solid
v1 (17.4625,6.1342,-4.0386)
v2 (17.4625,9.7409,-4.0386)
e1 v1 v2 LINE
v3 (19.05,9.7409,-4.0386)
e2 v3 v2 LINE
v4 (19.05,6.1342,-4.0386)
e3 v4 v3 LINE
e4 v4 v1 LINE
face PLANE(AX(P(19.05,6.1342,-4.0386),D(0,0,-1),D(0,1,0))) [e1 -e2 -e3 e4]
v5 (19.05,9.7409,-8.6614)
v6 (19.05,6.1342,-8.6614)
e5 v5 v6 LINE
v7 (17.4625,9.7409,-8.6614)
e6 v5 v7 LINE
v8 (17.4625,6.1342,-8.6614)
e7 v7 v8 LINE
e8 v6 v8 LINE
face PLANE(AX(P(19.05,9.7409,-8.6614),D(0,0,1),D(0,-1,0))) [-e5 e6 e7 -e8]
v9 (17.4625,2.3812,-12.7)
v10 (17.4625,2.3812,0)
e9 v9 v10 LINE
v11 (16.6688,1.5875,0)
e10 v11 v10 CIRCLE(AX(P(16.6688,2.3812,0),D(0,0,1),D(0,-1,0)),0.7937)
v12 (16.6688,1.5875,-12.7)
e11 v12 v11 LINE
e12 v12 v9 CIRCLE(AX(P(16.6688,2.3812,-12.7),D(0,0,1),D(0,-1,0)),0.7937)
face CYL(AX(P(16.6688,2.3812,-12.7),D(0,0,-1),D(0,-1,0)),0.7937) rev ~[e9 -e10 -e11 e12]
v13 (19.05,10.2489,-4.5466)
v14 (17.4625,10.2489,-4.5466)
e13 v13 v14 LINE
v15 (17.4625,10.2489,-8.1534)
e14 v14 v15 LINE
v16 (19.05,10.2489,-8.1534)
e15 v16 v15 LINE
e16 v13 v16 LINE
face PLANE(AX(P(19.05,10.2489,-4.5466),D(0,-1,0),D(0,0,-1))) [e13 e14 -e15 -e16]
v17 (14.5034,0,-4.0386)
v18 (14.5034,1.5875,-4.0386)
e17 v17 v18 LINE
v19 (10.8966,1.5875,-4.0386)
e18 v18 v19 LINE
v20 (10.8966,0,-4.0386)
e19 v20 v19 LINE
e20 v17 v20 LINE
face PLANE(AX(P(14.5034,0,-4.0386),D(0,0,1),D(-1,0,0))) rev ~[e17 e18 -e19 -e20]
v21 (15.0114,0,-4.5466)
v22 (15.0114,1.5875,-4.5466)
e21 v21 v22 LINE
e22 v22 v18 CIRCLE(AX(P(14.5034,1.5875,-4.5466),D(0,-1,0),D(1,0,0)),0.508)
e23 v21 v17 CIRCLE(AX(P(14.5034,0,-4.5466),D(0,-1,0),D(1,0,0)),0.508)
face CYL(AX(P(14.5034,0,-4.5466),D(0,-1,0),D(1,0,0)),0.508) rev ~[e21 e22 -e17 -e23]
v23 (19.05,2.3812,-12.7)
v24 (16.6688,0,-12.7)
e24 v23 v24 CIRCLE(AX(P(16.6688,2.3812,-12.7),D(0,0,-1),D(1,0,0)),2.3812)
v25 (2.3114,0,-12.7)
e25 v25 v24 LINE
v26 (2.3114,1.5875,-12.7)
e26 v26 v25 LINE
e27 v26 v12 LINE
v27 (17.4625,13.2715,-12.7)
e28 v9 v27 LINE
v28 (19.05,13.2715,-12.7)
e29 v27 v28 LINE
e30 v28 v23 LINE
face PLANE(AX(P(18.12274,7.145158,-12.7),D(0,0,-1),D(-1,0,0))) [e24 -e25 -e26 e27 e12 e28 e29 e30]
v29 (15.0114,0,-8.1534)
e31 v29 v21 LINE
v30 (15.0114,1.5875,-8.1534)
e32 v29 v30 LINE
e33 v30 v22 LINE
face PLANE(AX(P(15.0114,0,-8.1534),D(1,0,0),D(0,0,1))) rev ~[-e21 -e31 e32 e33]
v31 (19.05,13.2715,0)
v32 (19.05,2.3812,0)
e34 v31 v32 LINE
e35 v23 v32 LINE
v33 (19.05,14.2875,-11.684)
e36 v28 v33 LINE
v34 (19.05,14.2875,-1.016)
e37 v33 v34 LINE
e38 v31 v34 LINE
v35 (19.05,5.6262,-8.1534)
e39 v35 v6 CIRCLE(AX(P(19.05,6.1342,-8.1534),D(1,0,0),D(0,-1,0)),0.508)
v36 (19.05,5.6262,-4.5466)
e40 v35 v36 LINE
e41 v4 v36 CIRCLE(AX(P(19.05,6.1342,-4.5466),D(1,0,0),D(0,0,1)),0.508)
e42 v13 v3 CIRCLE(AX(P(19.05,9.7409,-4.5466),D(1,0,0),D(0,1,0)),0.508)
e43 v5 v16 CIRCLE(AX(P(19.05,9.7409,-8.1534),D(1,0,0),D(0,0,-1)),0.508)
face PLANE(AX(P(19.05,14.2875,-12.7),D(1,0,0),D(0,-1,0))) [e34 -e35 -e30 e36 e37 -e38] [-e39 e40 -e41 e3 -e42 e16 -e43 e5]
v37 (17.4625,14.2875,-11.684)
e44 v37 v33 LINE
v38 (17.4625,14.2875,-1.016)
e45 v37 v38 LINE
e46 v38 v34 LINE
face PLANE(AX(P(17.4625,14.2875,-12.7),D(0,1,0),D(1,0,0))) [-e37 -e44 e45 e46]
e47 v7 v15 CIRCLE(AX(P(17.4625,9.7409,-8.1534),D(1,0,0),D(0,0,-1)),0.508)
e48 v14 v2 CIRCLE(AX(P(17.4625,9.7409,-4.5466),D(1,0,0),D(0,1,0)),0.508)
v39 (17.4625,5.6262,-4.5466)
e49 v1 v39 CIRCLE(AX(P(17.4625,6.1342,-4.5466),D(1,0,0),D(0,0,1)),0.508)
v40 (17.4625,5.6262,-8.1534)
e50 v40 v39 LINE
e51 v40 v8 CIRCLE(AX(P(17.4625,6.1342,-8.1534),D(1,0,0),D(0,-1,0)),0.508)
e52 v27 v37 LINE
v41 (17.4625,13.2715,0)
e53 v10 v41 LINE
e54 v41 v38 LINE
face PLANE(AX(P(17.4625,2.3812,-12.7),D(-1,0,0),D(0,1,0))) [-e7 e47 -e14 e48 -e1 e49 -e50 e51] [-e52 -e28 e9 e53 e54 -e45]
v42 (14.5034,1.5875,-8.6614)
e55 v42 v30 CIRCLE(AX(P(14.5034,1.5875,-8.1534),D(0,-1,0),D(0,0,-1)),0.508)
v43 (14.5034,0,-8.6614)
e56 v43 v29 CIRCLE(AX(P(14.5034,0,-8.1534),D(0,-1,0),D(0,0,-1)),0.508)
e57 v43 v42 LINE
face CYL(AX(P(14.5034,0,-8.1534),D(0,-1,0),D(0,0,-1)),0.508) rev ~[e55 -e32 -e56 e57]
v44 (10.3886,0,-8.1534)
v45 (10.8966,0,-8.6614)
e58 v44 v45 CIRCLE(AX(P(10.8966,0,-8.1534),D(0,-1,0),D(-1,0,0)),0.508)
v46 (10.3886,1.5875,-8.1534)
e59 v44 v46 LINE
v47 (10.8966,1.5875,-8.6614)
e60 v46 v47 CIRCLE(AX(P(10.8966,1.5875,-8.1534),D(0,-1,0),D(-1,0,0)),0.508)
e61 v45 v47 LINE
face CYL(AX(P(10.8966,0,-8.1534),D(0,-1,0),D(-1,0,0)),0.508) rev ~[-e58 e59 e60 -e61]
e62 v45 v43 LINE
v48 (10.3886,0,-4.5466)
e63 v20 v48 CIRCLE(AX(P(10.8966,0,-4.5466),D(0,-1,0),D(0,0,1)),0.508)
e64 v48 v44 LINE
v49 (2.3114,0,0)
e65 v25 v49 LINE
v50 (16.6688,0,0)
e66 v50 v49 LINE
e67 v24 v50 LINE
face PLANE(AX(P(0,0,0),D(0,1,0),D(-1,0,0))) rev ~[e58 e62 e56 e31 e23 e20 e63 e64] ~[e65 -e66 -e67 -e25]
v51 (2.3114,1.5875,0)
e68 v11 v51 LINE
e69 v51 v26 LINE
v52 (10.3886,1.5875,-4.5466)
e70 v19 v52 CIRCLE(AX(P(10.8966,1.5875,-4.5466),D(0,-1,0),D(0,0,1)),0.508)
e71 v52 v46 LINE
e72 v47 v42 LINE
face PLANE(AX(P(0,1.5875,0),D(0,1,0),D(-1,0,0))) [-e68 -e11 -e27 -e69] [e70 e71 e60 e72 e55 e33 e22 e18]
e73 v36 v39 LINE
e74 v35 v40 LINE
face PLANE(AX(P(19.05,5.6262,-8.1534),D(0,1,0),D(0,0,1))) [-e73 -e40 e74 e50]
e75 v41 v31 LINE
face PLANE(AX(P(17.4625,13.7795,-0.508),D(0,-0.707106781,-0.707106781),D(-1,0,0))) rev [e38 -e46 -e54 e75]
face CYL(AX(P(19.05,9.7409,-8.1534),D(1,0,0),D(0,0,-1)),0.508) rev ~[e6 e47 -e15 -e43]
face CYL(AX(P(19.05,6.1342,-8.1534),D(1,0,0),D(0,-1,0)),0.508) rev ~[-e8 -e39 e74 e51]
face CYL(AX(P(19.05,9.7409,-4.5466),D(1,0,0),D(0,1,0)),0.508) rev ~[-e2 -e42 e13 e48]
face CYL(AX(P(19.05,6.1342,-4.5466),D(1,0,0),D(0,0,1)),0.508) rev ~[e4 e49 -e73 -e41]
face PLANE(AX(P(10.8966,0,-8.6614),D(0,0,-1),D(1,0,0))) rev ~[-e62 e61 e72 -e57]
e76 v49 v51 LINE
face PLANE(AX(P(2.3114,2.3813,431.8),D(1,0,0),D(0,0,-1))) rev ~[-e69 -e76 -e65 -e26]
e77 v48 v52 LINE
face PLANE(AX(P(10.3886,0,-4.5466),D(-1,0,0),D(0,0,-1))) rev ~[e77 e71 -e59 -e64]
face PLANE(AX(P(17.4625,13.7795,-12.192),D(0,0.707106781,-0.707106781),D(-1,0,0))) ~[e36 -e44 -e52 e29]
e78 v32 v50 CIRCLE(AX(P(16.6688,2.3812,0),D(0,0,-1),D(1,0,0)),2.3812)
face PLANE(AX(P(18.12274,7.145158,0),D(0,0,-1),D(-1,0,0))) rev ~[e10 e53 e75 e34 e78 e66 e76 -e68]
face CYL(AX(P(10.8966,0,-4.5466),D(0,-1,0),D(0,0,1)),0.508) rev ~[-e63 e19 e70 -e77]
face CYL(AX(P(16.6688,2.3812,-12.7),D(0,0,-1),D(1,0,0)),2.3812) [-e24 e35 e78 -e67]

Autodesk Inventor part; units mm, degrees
ref_plane "YZ Plane" through (0, 0, 0) normal (1, 0, 0) x (0, 1, 0)
ref_plane "XZ Plane" through (0, 0, 0) normal (0, 1, 0) x (-1, 0, 0)
sketch "Sketch1" plane through (0, 0, 0) normal (0, 1, 0) x (-1, 0, 0)
  line L0 (-19.05, 0) -> (19.05, 0)
  line L1 (19.05, 0) -> (19.05, -12.7)
  line L2 (19.05, -12.7) -> (-19.05, -12.7)
  line L3 (-19.05, -12.7) -> (-19.05, 0)
  line L4 (19.05, 0) -> (-19.05, -12.7) construction
  point P0 (0, 0)
  point P1 (0, 0)
  dimension "d0" = 38.1
  dimension "d1" = 12.7
extrude "Plate1" add sketch "Sketch1" along normal blind 1.5875
sketch "Sketch2" plane through (17.4625, 0, -12.7) normal (1, 0, 0) x (0, 1, 0)
  line L0 (0, 12.7) -> (0, 0)
  line L1 (0, 0) -> (14.2875, 0)
  line L2 (14.2875, 0) -> (14.2875, 12.7)
  line L3 (14.2875, 12.7) -> (0, 12.7)
edge flange "Flanges" height 12.7 angle 90 thickness 1.5875 bend radius 0.7937 thickness toward (1, 0, 0) relief tear relief width 1.5875 relief depth 0.7937 corner gap 1.5875 corner form 0 edges at (19.05, 1.5875, -6.35) (-19.05, 1.5875, -6.35) wall of the first edge with corners at (17.4625, 0, 0) (17.4625, 0, -12.7) (17.4625, 14.2875, -12.7) (17.4625, 14.2875, 0)
bend "Bend1"
corner "Corner1"
sketch "Sketch3" plane through (19.05, 2.3813, -12.7) normal (1, 0, 0) x (0, 0, -1)
  line L0 (-8.1534, 7.8676) -> (-4.5466, 7.8676)
  line L1 (-4.0386, 7.3596) -> (-4.0386, 3.7529)
  line L2 (-4.5466, 3.2449) -> (-8.1534, 3.2449)
  line L3 (-8.6614, 3.7529) -> (-8.6614, 7.3596)
  arc A0 (-8.1534, 7.8676) -> (-8.6614, 7.3596) centre (-8.1534, 7.3596) ccw
  arc A1 (-4.0386, 7.3596) -> (-4.5466, 7.8676) centre (-4.5466, 7.3596) ccw
  arc A2 (-4.5466, 3.2449) -> (-4.0386, 3.7529) centre (-4.5466, 3.7529) ccw
  arc A3 (-8.6614, 3.7529) -> (-8.1534, 3.2449) centre (-8.1534, 3.7529) ccw
  line L4 (-12.7, 0) -> (-12.7, 11.9063) construction
  line L5 (-12.7, 11.9063) -> (0, 11.9063) construction
  line L6 (-8.1534, 7.3596) -> (-4.5466, 3.7529) construction
  point P0 (-12.7, -2.3812)
  point P1 (-4.0386, 3.2449)
  point P2 (-8.6614, 3.2449)
  point P3 (-6.35, 5.5563)
  dimension "d16" = 4.6228
  dimension "d17" = 0.508
  dimension "d20" = 6.35
  dimension "d21" = 6.35
extrude "Flange Stamp" cut sketch "Sketch3" against normal blind 1.5875
sketch "Sketch7" plane through (19.05, 2.3813, 0) normal (1, 0, 0) x (0, 0, -1)
  arc A0 (4.5466, 7.8676) -> (4.0386, 7.3596) centre (4.5466, 7.3596) ccw construction
  arc A1 (8.1534, 3.2449) -> (8.6614, 3.7529) centre (8.1534, 3.7529) ccw construction
  circle A2 centre (6.35, 5.5563) radius 2.1844
  line L0 (4.5466, 7.3596) -> (8.1534, 3.7529) construction
  point P0 (0, -2.3812)
  dimension "d46" = 4.3688
surface extrude "Flange Circle" sketch "Sketch7" against normal up to surface (1.5875 mm away) shown yes curves A2
ref_plane "Flange Pattern Plane" through (19.05, 7.9375, -4.5466) normal (0, 1, 0) x (1, 0, 0)
feature "Flange Pattern" [suppressed]
sketch "Sketch8" plane through (0, 0, 0) normal (0, -1, 0) x (1, 0, 0)
  line L0 (16.6687, 0) -> (-16.6687, 0) construction
  line L1 (14.5034, -4.0386) -> (10.8966, -4.0386)
  line L2 (10.3886, -4.5466) -> (10.3886, -8.1534)
  line L3 (10.8966, -8.6614) -> (14.5034, -8.6614)
  line L4 (15.0114, -8.1534) -> (15.0114, -4.5466)
  arc A0 (15.0114, -4.5466) -> (14.5034, -4.0386) centre (14.5034, -4.5466) ccw
  arc A1 (14.5034, -8.6614) -> (15.0114, -8.1534) centre (14.5034, -8.1534) ccw
  arc A2 (10.3886, -8.1534) -> (10.8966, -8.6614) centre (10.8966, -8.1534) ccw
  arc A3 (10.8966, -4.0386) -> (10.3886, -4.5466) centre (10.8966, -4.5466) ccw
  line L5 (14.5034, -4.5466) -> (10.8966, -8.1534) construction
  line L6 (19.05, 0) -> (19.05, -12.7) construction
  point P0 (0, 0)
  point P1 (10.3886, -8.6614)
  point P2 (15.0114, -8.6614)
  point P3 (12.7, -6.35)
  dimension "d49" = 4.6228
  dimension "d50" = 0.508
  dimension "d51" = 6.35
  dimension "d52" = 6.35
extrude "Body Stamp" cut sketch "Sketch8" against normal blind 1.5875
sketch "Sketch9" plane through (0, 0, 0) normal (0, -1, 0) x (1, 0, 0)
  arc A0 (15.0114, -4.5466) -> (14.5034, -4.0386) centre (14.5034, -4.5466) ccw construction
  arc A1 (10.3886, -8.1534) -> (10.8966, -8.6614) centre (10.8966, -8.1534) ccw construction
  line L0 (14.5034, -4.5466) -> (10.8966, -8.1534) construction
  circle A2 centre (12.7, -6.35) radius 2.1844
  point P0 (0, 0)
  dimension "d55" = 4.3688
surface extrude "Body Circle" sketch "Sketch9" against normal up to surface (1.5875 mm away) shown yes curves A2
feature "Body Pattern" [suppressed]
sketch "Arc Length" plane through (17.4625, 2.3813, 0) normal (0, 0, 1) x (1, 0, 0)
  line L0 (0, 0) -> (1.5875, 0) construction
  arc A0 (-0.7938, -0.7938) -> (0, 0) centre (-0.7937, 0) ccw construction
  line L1 (-0.7938, -2.3813) -> (-0.7938, -0.7938) construction
  arc A1 (-0.7938, -2.3813) -> (1.5875, 0) centre (-0.7937, 0) ccw construction
  point P0 (-17.4625, -2.3812)
  dimension "d85" = 3.7405
  dimension "d92" = 1.2468
sketch "Sketch13" plane through (19.05, 14.2875, 0) normal (1, 0, 0) x (0, 0, -1)
  line L0 (0, 0) -> (12.7, 0) construction
  line L1 (62.4078, 0) -> (63.4238, -1.016)
  line L2 (63.4238, -1.016) -> (64.4398, 0)
  line L3 (62.4078, 0) -> (64.4398, 0)
  line L4 (12.7, -11.9063) -> (0, -11.9062) construction
  line L5 (63.4238, -10.8903) -> (61.161, -13.1531)
  line L6 (61.161, -13.1531) -> (63.4238, -15.4159)
  line L7 (63.4238, -15.4159) -> (65.6866, -13.1531)
  line L8 (65.6866, -13.1531) -> (63.4238, -10.8903)
  line L9 (63.4238, -10.8903) -> (63.4238, -15.4159) construction
  line L10 (63.4238, -1.016) -> (63.4238, -10.8903) construction
  line L11 (0, -11.9062) -> (12.7, -11.9063) construction
  point P0 (0, -14.2875)
  dimension "d86" = 4.5256
  dimension "d88" = 1.016
  dimension "d91" = 1.016
  dimension "d102" = 63.4238
feature "Notch" [suppressed]
mirror "Notch Mirror" [suppressed]
pattern_linear "Notch Pattern" [suppressed]
chamfer "End Chamfer" distance 1.016 angle 45 4 edges at (-18.2563, 14.2875, -12.7) (18.2563, 14.2875, -12.7) (-18.2562, 14.2875, 0) (18.2562, 14.2875, 0)
sketch "Sketch14" plane through (-19.05, 2.3813, 431.8) normal (1, 0, 0) x (0, 0, -1)
  line L0 (431.8, 11.9063) -> (444.5, 11.9063) construction
  line L1 (431.8, 0) -> (431.8, 11.9063) construction
  line L2 (431.8, -2.3813) -> (444.5, -2.3813) construction
  line L3 (431.8, 11.9063) -> (444.5, 11.9063)
  line L4 (444.5, 11.9063) -> (444.5, -2.3813)
  line L5 (444.5, -2.3813) -> (431.8, -2.3813)
  line L6 (431.8, -2.3813) -> (431.8, 11.9063)
  point P0 (431.8, -2.3812)
  point P1 (382.0521, -1.9844)
extrude "Half Cut" cut sketch "Sketch14" along normal blind 21.3614
sketch "Flange Pattern Sketch" plane through (19.05, 7.9375, -4.5466) normal (0, 1, 0) x (1, 0, 0)
  line L0 (0, 3.6068) -> (0, 0) construction
  line L1 (-45.8186, -4.5466) -> (8.2118, -4.5466) construction
  line L2 (0, 0) -> (-1.5875, 0) construction
  point P0 (-19.05, -4.5466)
  point P1 (0, 1.8034)
  point P2 (0, 14.5034)
  point P3 (0, 27.2034)
  point P4 (0, 39.9034)
  point P5 (0, 52.6034)
  point P6 (0, 65.3034)
  point P7 (0, 78.0034)
  point P8 (0, 90.7034)
  point P9 (0, 103.4034)
  point P10 (0, 116.1034)
  point P11 (0, 128.8034)
  point P12 (0, 141.5034)
  point P13 (0, 154.2034)
  point P14 (0, 166.9034)
  point P15 (0, 179.6034)
  point P16 (0, 192.3034)
  point P17 (0, 205.0034)
  point P18 (0, 217.7034)
  point P19 (0, 230.4034)
  point P20 (0, 243.1034)
  point P21 (0, 255.8034)
  point P22 (0, 268.5034)
  point P23 (0, 281.2034)
  point P24 (0, 293.9034)
  point P25 (0, 306.6034)
  point P26 (0, 319.3034)
  point P27 (0, 332.0034)
  point P28 (0, 344.7034)
  point P29 (0, 357.4034)
  point P30 (0, 370.1034)
  point P31 (0, 382.8034)
  point P32 (0, 395.5034)
  point P33 (0, 408.2034)
  point P34 (0, 420.9034)
  point P35 (0, 433.6034)
  dimension "d131" = 12.7
  dimension "d134" = 12.7
sketch "Body Pattern Sketch" plane through (0, 0, 0) normal (0, -1, 0) x (1, 0, 0)
  line L0 (16.6687, 0) -> (-16.6687, 0) construction
  line L1 (19.05, 0) -> (19.05, -12.7) construction
  circle A0 centre (12.7, -6.35) radius 2.1844 construction
  point P0 (0, 0)
  point P1 (12.7, -19.05)
  point P2 (12.7, -31.75)
  point P3 (12.7, -44.45)
  point P4 (12.7, -57.15)
  point P5 (12.7, -69.85)
  point P6 (12.7, -82.55)
  point P7 (12.7, -95.25)
  point P8 (12.7, -107.95)
  point P9 (12.7, -120.65)
  point P10 (12.7, -133.35)
  point P11 (12.7, -146.05)
  point P12 (12.7, -158.75)
  point P13 (12.7, -171.45)
  point P14 (12.7, -184.15)
  point P15 (12.7, -196.85)
  point P16 (12.7, -209.55)
  point P17 (12.7, -222.25)
  point P18 (12.7, -234.95)
  point P19 (12.7, -247.65)
  point P20 (12.7, -260.35)
  point P21 (12.7, -273.05)
  point P22 (12.7, -285.75)
  point P23 (12.7, -298.45)
  point P24 (12.7, -311.15)
  point P25 (12.7, -323.85)
  point P26 (12.7, -336.55)
  point P27 (12.7, -349.25)
  point P28 (12.7, -361.95)
  point P29 (12.7, -374.65)
  point P30 (12.7, -387.35)
  point P31 (12.7, -400.05)
  point P32 (12.7, -412.75)
  point P33 (12.7, -425.45)
  point P34 (12.7, -438.15)
  dimension "d62" = 12.7
  dimension "d65" = 12.7
  dimension "d139" = 12.7
equation "\"d1\" = 12.7 * Length"
equation "\"d18\" = Thickness"
equation "\"d53\" = Thickness"
equation "\"d89\" = Thickness"
equation "\"d2\" = Thickness"
equation "\"d3\" = BendReliefWidth"
equation "\"d4\" = BendReliefDepth"
equation "\"d5\" = MinimumRemnant"
equation "\"d6\" = TransitionRadius"
equation "\"d10\" = CornerReliefSize"
equation "\"d11\" = GapSize"
equation "\"d12\" = JacobiRadiusSize"
equation "\"BendRadius\" = Thickness"
equation "\"BendReliefWidth\" = Thickness"
equation "\"BendReliefDepth\" = 0.5 * Thickness"
equation "\"CornerReliefSize\" = 4 * Thickness"
equation "\"MinimumRemnant\" = 2 * Thickness"
equation "\"TransitionRadius\" = BendRadius"
equation "\"JacobiRadiusSize\" = BendRadius"
equation "\"GapSize\" = Thickness"
equation "\"Length\" = 1"
equation "\"Thickness\" = 1.5875"
properties part number "Alu C 1x3x1x35"
